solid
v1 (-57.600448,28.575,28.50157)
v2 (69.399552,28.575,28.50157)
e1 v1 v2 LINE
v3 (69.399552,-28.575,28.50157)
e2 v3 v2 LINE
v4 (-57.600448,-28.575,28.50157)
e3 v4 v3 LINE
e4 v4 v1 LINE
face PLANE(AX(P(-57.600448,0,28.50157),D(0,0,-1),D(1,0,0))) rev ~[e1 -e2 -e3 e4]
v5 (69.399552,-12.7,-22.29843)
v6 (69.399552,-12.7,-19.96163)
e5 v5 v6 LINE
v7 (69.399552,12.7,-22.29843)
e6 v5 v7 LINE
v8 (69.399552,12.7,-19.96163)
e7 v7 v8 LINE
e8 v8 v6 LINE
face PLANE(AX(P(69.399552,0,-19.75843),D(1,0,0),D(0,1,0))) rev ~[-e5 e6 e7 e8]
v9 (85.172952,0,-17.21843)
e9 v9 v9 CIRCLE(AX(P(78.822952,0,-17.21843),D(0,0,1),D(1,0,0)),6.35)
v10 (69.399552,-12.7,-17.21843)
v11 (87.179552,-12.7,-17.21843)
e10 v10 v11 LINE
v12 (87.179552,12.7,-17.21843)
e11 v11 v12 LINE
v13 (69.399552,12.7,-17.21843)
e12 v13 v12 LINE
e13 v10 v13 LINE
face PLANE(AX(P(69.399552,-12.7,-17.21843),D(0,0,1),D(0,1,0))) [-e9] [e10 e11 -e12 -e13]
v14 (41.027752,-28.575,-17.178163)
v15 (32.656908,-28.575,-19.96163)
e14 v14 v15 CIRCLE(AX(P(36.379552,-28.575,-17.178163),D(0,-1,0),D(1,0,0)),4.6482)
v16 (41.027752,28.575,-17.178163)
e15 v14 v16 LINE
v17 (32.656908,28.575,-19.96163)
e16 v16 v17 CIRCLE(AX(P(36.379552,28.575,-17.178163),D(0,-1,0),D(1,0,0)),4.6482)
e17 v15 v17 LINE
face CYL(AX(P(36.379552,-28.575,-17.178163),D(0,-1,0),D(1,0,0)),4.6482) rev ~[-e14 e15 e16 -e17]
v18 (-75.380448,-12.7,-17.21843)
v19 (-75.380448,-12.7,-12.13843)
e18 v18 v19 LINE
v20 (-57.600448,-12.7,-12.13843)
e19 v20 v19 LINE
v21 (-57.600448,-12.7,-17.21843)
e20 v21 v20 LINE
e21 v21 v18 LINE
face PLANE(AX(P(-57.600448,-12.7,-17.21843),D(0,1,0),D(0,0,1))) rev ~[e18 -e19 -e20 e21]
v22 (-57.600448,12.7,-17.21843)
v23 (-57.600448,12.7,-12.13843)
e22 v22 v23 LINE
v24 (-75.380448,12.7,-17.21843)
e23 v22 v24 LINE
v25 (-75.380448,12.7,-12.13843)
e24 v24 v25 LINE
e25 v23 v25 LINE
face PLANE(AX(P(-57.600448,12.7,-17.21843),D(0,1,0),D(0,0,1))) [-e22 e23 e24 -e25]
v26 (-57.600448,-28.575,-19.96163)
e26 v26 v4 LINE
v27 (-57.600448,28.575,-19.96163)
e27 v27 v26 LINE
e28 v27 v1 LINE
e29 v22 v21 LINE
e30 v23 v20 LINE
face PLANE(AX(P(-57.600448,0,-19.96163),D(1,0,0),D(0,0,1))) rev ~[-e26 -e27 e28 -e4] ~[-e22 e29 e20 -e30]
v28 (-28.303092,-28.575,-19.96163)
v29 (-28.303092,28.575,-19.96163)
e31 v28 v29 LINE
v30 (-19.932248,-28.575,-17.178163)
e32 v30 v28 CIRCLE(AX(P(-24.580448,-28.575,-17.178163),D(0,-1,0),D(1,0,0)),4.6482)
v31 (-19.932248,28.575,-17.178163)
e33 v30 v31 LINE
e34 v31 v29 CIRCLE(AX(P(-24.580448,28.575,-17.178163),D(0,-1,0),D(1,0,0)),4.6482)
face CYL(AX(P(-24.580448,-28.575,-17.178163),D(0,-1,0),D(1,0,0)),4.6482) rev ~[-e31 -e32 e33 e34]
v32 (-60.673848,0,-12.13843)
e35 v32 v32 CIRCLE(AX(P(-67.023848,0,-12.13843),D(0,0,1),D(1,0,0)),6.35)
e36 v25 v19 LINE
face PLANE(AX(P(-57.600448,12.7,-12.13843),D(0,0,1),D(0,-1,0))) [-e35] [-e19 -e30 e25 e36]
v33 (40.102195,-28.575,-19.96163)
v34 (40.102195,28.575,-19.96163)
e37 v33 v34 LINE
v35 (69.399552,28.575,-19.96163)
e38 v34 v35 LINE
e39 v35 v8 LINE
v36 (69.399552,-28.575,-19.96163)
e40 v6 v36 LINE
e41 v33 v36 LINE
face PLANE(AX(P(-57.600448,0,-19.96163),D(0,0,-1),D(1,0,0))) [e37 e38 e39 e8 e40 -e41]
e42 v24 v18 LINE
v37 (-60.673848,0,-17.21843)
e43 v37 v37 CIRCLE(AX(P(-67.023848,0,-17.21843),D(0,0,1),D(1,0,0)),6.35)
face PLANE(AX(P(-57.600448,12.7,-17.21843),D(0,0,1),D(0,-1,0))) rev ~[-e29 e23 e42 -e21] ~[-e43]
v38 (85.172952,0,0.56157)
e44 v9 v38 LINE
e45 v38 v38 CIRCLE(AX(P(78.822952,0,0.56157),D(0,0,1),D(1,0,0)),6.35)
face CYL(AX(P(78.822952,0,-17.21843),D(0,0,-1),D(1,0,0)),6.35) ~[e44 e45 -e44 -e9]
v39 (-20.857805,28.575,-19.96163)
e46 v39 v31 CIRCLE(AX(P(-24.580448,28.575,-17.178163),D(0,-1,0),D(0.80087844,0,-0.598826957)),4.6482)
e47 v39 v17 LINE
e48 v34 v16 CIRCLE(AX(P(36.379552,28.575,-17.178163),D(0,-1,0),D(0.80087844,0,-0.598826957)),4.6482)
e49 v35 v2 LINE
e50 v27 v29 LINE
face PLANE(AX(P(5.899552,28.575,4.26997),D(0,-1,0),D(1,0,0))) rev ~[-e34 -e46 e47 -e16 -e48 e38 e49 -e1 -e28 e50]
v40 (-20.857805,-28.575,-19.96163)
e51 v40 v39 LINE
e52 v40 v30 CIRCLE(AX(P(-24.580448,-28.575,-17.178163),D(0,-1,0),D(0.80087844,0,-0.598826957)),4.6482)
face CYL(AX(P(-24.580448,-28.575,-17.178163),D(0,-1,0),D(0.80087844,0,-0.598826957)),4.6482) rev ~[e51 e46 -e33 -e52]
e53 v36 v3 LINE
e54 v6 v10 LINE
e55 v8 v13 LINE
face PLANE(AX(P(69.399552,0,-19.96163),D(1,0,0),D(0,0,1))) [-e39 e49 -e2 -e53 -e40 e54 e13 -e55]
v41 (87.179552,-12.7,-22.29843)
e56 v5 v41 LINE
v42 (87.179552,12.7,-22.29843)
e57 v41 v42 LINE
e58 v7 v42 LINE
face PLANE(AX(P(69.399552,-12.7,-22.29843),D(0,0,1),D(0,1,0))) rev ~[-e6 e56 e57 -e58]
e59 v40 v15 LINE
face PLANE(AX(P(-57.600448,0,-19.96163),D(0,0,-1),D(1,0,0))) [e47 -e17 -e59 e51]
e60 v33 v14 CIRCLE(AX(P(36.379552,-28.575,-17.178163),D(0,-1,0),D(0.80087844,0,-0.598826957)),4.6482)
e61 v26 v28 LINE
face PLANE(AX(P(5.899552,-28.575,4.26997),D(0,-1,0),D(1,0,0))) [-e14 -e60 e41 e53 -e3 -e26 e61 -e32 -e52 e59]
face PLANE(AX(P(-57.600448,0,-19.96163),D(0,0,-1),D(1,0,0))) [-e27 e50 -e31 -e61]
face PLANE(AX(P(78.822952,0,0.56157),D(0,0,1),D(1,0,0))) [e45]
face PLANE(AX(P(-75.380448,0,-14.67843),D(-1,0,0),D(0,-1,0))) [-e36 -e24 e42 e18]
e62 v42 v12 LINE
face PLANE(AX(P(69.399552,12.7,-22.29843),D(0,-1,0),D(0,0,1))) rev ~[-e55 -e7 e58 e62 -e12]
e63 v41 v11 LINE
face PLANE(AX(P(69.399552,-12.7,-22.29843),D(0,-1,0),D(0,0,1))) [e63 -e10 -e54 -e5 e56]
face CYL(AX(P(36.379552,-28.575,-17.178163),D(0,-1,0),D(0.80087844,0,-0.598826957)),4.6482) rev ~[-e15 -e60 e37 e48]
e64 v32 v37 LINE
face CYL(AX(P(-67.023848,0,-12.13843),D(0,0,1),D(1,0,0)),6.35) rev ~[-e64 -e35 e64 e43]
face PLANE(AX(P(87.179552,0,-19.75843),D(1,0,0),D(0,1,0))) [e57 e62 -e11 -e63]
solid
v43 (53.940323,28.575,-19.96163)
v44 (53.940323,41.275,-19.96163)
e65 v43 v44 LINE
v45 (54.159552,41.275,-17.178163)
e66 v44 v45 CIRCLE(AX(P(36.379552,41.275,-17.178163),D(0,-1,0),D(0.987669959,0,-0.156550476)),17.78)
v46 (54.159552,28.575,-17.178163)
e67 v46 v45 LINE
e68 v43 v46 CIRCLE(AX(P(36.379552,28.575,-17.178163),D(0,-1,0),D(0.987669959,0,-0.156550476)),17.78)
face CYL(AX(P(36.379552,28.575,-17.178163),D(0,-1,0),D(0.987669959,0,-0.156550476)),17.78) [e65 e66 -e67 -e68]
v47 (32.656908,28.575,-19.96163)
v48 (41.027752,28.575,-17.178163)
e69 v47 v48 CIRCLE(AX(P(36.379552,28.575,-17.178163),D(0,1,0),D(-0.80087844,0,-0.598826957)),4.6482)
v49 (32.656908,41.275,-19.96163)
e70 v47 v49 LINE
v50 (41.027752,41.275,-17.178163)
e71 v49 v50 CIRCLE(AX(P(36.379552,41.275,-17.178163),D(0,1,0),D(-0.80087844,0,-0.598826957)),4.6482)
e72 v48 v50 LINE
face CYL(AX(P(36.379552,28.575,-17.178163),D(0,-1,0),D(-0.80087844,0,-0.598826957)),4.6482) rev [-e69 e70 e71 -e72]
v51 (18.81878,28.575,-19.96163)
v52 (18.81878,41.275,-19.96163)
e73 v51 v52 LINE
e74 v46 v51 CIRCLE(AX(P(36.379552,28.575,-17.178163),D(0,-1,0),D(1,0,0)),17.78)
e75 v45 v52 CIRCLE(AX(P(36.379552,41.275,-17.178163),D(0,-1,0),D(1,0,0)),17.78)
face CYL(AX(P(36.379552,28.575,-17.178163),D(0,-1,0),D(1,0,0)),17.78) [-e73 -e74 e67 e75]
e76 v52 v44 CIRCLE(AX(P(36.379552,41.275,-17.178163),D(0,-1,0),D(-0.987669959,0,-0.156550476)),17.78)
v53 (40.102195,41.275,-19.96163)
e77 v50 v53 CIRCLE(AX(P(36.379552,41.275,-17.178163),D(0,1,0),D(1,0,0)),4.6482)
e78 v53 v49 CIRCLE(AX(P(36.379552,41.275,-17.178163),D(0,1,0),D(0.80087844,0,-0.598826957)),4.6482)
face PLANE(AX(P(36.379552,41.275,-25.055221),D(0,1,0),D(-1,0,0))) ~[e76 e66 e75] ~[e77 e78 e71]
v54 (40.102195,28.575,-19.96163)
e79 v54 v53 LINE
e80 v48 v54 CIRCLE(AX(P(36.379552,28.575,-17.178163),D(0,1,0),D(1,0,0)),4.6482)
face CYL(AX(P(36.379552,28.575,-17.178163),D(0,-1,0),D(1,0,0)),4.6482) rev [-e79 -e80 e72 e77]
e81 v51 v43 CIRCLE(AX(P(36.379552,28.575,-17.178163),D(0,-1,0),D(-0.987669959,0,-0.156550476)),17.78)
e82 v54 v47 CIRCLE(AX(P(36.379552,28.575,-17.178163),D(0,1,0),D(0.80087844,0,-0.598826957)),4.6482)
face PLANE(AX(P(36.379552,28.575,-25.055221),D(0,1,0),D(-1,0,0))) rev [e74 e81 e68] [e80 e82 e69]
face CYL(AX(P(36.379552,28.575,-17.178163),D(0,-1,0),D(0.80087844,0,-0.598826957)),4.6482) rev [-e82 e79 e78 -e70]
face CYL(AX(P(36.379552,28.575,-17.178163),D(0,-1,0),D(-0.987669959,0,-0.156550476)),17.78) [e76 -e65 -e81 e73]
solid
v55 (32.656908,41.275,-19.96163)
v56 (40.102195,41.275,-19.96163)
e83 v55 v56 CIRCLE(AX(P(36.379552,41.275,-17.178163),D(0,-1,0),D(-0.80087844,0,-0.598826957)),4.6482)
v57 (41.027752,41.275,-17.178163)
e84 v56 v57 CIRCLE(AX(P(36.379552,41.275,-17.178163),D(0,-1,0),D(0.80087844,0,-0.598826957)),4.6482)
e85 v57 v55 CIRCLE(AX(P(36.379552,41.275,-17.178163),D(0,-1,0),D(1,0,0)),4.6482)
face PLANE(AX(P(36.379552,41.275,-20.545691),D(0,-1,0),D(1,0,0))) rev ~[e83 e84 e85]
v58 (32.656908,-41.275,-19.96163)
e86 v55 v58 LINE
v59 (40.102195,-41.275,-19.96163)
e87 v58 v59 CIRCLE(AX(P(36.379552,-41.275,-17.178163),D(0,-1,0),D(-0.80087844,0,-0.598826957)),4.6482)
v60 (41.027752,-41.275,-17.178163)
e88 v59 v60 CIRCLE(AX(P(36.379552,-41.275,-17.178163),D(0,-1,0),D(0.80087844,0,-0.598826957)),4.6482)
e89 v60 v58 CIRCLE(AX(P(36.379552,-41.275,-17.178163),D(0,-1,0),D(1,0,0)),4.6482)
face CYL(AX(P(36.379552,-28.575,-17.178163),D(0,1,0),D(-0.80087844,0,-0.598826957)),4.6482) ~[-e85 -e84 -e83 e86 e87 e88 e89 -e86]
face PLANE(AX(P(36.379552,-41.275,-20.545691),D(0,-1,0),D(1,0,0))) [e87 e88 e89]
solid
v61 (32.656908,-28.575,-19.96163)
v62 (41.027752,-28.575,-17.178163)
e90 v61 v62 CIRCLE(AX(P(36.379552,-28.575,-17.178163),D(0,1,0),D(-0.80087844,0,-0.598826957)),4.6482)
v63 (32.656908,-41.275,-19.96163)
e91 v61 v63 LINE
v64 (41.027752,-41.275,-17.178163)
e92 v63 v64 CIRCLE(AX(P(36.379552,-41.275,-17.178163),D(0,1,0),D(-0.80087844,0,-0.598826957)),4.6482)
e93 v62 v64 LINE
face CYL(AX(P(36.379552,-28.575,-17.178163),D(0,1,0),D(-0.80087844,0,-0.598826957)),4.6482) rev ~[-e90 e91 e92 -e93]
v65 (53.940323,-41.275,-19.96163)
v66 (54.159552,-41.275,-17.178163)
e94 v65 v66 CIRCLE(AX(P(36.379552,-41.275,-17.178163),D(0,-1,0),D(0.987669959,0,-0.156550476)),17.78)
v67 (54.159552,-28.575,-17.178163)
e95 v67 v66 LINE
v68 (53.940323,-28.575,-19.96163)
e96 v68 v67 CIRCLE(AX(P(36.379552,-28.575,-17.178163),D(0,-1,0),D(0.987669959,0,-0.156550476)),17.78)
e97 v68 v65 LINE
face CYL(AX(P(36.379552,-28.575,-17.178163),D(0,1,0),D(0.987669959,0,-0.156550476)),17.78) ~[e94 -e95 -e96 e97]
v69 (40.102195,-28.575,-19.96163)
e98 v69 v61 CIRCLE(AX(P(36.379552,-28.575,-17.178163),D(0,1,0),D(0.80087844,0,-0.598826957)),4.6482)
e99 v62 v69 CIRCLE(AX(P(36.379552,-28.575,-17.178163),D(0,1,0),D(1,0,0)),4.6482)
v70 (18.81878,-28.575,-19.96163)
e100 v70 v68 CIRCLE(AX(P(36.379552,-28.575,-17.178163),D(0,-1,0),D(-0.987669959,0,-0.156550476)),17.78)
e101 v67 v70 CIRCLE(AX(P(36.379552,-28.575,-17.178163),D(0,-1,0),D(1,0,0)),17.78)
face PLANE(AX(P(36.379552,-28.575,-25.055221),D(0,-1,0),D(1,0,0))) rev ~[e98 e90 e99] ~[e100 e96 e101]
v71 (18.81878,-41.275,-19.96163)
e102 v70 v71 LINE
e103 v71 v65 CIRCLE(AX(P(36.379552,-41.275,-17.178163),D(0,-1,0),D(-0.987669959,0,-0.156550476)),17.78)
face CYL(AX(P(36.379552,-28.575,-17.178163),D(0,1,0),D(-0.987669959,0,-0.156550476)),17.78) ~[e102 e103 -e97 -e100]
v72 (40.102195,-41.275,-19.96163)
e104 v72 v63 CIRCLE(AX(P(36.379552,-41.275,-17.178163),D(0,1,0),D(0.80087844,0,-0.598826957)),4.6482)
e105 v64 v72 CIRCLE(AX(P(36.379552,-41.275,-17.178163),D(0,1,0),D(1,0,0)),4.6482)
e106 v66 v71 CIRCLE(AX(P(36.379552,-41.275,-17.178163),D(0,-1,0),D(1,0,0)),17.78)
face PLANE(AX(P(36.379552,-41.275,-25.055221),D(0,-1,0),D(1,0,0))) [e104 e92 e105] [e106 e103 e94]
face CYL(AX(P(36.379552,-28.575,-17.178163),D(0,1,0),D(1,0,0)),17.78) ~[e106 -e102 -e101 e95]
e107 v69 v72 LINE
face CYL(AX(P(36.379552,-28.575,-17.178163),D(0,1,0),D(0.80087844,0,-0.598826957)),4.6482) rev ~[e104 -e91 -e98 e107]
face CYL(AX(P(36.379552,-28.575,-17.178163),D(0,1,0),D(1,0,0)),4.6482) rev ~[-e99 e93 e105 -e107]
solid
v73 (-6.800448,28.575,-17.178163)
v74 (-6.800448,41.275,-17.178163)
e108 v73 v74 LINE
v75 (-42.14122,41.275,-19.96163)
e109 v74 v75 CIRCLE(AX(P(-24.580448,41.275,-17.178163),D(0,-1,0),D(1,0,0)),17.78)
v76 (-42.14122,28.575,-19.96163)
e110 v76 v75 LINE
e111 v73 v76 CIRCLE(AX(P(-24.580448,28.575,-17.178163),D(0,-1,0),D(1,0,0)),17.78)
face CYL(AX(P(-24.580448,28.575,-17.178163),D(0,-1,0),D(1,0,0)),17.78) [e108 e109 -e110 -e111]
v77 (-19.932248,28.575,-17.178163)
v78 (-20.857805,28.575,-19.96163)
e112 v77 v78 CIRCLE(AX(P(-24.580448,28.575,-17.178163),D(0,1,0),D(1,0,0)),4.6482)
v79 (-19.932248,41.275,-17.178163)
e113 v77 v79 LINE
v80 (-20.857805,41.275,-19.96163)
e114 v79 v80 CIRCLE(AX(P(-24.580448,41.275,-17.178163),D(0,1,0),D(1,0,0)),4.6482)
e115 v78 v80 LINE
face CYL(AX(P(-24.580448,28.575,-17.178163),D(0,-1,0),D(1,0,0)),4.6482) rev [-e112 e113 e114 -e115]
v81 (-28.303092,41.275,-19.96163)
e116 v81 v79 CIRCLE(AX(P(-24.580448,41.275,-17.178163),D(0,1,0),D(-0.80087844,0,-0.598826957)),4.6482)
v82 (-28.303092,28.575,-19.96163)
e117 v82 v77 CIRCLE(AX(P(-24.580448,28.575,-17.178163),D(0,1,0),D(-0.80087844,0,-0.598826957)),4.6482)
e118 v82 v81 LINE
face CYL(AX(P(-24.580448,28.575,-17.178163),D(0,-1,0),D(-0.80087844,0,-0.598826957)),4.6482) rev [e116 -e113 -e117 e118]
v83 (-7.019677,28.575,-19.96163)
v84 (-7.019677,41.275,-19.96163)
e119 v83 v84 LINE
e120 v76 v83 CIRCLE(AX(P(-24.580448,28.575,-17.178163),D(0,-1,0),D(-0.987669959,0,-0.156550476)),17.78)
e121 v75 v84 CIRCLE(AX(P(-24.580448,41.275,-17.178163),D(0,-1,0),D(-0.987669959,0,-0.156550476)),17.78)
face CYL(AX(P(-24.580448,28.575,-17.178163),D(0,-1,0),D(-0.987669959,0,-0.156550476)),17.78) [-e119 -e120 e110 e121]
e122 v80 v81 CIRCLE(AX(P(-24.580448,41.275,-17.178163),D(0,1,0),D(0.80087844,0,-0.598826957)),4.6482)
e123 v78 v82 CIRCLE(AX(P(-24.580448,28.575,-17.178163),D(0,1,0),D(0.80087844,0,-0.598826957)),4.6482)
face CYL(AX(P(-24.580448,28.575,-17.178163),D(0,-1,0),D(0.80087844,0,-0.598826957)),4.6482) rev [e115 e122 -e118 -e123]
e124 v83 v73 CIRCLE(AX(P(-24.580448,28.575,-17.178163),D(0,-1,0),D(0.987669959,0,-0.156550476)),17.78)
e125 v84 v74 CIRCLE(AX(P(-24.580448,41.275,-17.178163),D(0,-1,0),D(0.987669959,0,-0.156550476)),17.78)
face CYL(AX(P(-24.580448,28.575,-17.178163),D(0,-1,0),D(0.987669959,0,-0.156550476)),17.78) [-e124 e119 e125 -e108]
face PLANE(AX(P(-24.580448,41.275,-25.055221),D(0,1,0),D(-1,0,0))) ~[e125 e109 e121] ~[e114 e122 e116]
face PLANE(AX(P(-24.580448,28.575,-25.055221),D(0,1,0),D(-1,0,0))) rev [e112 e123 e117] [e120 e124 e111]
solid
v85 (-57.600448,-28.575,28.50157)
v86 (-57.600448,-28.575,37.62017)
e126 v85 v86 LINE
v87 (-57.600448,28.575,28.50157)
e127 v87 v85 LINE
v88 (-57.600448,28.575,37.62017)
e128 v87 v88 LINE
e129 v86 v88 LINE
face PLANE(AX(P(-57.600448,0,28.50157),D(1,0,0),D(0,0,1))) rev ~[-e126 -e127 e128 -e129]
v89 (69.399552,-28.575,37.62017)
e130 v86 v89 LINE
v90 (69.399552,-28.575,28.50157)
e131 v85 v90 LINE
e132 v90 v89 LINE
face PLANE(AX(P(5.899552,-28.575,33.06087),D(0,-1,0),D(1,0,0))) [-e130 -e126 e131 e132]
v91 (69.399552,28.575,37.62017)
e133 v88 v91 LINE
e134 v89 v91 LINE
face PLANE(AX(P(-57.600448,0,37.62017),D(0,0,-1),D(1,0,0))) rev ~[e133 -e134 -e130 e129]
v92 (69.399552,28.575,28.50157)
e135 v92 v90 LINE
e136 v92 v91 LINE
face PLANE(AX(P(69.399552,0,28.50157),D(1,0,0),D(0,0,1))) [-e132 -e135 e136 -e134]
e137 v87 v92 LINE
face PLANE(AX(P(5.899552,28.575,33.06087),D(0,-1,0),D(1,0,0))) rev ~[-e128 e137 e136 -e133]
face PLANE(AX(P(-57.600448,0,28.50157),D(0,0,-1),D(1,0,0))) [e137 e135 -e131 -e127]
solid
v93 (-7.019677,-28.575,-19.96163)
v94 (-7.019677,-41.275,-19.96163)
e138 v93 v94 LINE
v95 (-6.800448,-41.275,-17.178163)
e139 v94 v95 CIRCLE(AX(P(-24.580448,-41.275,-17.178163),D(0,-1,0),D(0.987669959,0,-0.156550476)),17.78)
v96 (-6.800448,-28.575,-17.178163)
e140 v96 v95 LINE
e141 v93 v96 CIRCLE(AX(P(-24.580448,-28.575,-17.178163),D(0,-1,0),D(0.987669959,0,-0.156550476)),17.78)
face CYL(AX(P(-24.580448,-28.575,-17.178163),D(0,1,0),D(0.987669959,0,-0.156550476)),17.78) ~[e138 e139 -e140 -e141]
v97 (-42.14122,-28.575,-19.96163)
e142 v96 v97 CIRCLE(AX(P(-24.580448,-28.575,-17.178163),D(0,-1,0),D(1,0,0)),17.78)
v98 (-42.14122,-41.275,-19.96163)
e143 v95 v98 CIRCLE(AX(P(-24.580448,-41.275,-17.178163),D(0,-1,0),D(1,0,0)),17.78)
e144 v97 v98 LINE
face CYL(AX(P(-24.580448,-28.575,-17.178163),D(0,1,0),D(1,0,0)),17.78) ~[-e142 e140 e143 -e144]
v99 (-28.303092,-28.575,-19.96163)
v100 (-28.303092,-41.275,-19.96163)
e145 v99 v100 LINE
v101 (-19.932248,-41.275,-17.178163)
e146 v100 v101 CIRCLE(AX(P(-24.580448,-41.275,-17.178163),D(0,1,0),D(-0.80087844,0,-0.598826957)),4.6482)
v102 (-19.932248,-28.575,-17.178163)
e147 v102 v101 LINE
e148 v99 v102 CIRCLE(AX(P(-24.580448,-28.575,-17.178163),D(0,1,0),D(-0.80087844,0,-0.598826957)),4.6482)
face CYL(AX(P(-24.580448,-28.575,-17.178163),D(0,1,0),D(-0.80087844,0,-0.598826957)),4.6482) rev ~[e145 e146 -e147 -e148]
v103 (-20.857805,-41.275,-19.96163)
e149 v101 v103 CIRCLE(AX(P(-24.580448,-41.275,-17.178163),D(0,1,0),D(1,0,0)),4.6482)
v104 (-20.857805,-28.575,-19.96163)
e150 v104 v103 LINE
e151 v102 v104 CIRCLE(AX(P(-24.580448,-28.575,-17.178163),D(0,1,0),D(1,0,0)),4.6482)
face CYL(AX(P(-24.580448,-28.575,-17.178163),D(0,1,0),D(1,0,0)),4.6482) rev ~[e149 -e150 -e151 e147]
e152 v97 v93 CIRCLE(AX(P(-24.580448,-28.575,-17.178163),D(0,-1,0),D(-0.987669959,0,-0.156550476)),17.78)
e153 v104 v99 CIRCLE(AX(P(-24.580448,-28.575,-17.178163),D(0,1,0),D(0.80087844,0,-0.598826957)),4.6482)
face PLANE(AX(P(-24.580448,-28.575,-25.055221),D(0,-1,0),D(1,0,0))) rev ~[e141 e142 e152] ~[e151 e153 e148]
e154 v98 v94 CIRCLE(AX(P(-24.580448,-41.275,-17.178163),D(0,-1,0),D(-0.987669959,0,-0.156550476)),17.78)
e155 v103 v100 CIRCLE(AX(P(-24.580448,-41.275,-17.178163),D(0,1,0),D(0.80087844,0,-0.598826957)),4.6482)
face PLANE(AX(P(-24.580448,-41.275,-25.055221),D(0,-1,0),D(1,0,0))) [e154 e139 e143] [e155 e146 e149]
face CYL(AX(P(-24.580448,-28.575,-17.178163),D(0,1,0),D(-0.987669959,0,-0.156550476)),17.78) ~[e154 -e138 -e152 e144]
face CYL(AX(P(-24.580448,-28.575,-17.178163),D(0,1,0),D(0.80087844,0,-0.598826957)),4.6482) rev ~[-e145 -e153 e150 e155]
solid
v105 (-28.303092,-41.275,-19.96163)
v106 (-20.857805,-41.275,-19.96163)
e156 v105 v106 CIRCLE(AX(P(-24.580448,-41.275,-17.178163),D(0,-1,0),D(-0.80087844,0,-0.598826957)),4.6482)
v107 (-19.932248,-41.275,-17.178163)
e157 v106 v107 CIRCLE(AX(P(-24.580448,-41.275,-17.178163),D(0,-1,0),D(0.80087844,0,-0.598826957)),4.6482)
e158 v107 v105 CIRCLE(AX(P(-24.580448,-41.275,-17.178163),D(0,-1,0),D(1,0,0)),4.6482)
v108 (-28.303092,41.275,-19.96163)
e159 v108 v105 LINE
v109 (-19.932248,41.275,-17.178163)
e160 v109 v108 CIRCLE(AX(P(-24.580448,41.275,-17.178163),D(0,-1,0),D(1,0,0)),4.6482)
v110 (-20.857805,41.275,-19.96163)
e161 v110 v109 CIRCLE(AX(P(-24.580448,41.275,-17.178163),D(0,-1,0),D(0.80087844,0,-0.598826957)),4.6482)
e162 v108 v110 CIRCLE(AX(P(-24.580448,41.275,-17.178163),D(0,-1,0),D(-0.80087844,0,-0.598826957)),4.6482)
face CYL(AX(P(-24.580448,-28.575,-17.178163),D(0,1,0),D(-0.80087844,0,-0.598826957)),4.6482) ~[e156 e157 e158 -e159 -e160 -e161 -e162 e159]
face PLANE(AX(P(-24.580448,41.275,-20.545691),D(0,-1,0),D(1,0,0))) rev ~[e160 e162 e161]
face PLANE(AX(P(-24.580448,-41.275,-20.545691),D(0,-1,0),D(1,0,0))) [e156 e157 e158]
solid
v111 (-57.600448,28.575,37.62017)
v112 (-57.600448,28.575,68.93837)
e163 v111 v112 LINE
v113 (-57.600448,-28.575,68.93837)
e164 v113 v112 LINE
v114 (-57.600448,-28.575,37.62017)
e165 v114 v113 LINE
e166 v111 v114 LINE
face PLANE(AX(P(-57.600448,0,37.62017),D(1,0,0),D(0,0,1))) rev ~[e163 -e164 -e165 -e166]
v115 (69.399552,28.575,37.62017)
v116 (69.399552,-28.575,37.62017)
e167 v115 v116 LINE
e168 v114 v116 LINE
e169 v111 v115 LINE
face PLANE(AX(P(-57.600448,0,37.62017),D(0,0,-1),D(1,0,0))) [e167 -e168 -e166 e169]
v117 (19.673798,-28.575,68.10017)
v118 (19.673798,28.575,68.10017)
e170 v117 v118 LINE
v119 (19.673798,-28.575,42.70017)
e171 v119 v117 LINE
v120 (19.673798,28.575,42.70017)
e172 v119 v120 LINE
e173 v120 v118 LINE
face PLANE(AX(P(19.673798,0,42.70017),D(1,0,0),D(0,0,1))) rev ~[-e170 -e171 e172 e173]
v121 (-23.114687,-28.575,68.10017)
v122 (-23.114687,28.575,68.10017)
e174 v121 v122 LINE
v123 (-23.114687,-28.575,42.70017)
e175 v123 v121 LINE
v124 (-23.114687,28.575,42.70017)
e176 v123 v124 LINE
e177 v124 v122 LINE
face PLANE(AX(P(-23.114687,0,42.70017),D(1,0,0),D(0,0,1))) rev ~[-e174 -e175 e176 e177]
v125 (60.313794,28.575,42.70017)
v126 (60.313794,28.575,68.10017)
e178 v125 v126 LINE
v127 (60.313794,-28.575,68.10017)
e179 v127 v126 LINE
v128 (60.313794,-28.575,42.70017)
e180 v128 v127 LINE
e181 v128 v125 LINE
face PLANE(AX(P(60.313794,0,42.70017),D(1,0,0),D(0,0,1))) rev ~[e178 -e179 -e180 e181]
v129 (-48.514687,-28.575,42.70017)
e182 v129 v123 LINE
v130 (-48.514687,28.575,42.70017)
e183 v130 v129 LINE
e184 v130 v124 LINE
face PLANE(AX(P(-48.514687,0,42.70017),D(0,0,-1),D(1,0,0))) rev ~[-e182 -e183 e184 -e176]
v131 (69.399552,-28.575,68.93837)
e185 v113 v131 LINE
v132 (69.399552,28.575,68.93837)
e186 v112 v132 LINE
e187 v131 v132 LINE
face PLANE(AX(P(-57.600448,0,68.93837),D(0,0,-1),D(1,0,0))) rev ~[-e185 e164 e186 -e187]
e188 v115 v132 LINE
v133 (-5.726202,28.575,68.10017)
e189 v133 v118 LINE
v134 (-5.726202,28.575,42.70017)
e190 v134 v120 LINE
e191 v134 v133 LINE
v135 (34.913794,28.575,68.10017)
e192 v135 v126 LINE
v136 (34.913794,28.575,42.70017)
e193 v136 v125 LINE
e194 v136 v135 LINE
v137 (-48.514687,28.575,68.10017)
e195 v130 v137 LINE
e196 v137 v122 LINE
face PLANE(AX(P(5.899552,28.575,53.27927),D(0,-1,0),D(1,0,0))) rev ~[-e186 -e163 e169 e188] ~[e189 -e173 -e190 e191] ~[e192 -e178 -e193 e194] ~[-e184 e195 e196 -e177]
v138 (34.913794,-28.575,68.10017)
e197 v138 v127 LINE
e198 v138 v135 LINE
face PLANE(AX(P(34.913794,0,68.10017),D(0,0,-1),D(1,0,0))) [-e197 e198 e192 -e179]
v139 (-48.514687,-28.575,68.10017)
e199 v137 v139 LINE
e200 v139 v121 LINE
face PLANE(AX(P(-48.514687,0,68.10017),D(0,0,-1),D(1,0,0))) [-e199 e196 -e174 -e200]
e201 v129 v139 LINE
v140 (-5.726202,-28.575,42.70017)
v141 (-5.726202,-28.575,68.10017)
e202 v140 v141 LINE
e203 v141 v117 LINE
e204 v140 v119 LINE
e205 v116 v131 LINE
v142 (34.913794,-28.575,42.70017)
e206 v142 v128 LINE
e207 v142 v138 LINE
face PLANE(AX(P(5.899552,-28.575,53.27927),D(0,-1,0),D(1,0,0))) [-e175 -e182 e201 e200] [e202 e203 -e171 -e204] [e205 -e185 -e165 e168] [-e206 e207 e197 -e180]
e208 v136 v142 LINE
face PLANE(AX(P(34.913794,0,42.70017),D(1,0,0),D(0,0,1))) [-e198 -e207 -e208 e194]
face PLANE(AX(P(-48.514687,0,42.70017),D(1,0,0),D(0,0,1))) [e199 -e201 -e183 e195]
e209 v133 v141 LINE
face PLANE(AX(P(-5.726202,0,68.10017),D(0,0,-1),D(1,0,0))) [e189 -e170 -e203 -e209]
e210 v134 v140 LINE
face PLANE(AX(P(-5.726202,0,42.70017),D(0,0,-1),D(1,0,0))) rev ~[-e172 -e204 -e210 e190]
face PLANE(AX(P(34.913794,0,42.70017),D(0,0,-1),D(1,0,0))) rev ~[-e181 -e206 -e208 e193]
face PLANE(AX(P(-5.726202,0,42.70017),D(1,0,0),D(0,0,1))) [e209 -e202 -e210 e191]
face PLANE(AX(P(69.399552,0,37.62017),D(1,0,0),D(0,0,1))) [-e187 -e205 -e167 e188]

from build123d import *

# Parameters (mm, degrees)
F0_W          = 127
F0_H          = 31.3182
F0_W_2        = 25.4
F0_H_2        = 25.4
F1_DEPTH      = 28.575
F0_H_3        = 48.4632
F0_H_4        = 9.1186
F2_DEPTH      = 28.575
F4_DEPTH      = 12.7
F6_DEPTH      = 23.114
F7_DEPTH      = 82.804
F7_DEPTH_BACK = 76.2
F8_DEPTH      = 69.85
F8_DEPTH_BACK = 12.7
F9_W          = 25.4
F9_H          = 5.08
F10_DEPTH     = 17.78
F11_R         = 6.35
F12_DEPTH     = 17.78
F13_W         = 25.4
F13_H         = 5.08
F14_DEPTH     = 17.78
F15_R         = 6.35
F16_DEPTH     = 25.4


with BuildPart() as f1:
    # F0 (on Front) → F1 (new body, symmetric)
    with BuildSketch(Plane.XZ):
        with Locations((5.8995515195, 53.2792696041)):
            Rectangle(F0_W, F0_H)
        with Locations((-35.8146865249, 55.4001696041)):
            Rectangle(F0_W_2, F0_H_2, mode=Mode.SUBTRACT)
        with Locations((6.9737978751, 55.4001696041)):
            Rectangle(F0_W_2, F0_H_2, mode=Mode.SUBTRACT)
        with Locations((47.6137937195, 55.4001696041)):
            Rectangle(F0_W_2, F0_H_2, mode=Mode.SUBTRACT)
    extrude(amount=F1_DEPTH, both=True)

    # F3 (on face) → F6 (cut)
    with BuildSketch(Plane.XZ.offset(28.575)):
        with BuildLine():
            Line((-28.3030916435, -19.9616303959), (-42.1412203564, -19.9616303959))
            ThreePointArc((-42.1412203564, -19.9616303959), (-24.5804484805, -34.9581629324), (-7.0196766045, -19.9616303959))
            Line((-7.0196766045, -19.9616303959), (-20.8578053174, -19.9616303959))
            ThreePointArc((-20.8578053174, -19.9616303959), (-24.5804484805, -21.8263629324), (-28.3030916435, -19.9616303959))
        make_face()
        with BuildLine():
            Line((32.6569083565, -19.9616303959), (18.8187796436, -19.9616303959))
            ThreePointArc((18.8187796436, -19.9616303959), (36.3795515195, -34.9581629324), (53.9403233955, -19.9616303959))
            Line((53.9403233955, -19.9616303959), (40.1021946826, -19.9616303959))
            ThreePointArc((40.1021946826, -19.9616303959), (36.3795515195, -21.8263629324), (32.6569083565, -19.9616303959))
        make_face()
    extrude(amount=-F6_DEPTH, mode=Mode.SUBTRACT)


with BuildPart() as f1b:
    # F0 (on Front) → F1, piece 2 (new body, symmetric)
    with BuildSketch(Plane.XZ):
        with Locations((5.8995515195, 4.2699696041)):
            Rectangle(F0_W, F0_H_3)
    extrude(amount=F1_DEPTH, both=True)

    # F3 (on face) → F7 (cut, two sides)
    with BuildSketch(Plane.XZ.offset(28.575)) as f7_sk:
        with BuildLine():
            Line((40.1021946826, -19.9616303959), (32.6569083565, -19.9616303959))
            ThreePointArc((32.6569083565, -19.9616303959), (36.3795515195, -21.8263629324), (40.1021946826, -19.9616303959))
        make_face()
        with BuildLine():
            ThreePointArc((41.0277515195, -17.1781629324), (34.9128931937, -12.7674173497), (32.6569083565, -19.9616303959))
            Line((32.6569083565, -19.9616303959), (40.1021946826, -19.9616303959))
            ThreePointArc((40.1021946826, -19.9616303959), (40.7902971022, -18.6448212582), (41.0277515195, -17.1781629324))
        make_face()
        with BuildLine():
            Line((-20.8578053174, -19.9616303959), (-28.3030916435, -19.9616303959))
            ThreePointArc((-28.3030916435, -19.9616303959), (-24.5804484805, -21.8263629324), (-20.8578053174, -19.9616303959))
        make_face()
        with BuildLine():
            ThreePointArc((-19.9322484805, -17.1781629324), (-26.0471068063, -12.7674173497), (-28.3030916435, -19.9616303959))
            Line((-28.3030916435, -19.9616303959), (-20.8578053174, -19.9616303959))
            ThreePointArc((-20.8578053174, -19.9616303959), (-20.1697028978, -18.6448212582), (-19.9322484805, -17.1781629324))
        make_face()
    extrude(amount=-F7_DEPTH, mode=Mode.SUBTRACT)
    extrude(f7_sk.sketch, amount=F7_DEPTH_BACK, mode=Mode.SUBTRACT)

    # F9 (on face) → F10 (join)
    with BuildSketch(Plane.YZ.offset(69.3995515195)):
        with Locations((0, -19.7584303959)):
            Rectangle(F9_W, F9_H)
    extrude(amount=F10_DEPTH)

    # F11 (on face) → F12 (join)
    with BuildSketch(Plane.XY.offset(-17.2184303959)):
        with Locations((78.8229515195, 0)):
            Circle(F11_R)
    extrude(amount=F12_DEPTH)

    # F13 (on face) → F14 (join)
    with BuildSketch(Plane(origin=(-57.6004484805, 0, 0), x_dir=(0, -1, 0), z_dir=(-1, 0, 0))):
        with Locations((0, -14.6784303959)):
            Rectangle(F13_W, F13_H)
    extrude(amount=F14_DEPTH)

    # F15 (on face) → F16 (cut)
    with BuildSketch(Plane.XY.offset(-12.1384303959)):
        with Locations((-67.0238484805, 0)):
            Circle(F15_R)
    extrude(amount=-F16_DEPTH, mode=Mode.SUBTRACT)


with BuildPart() as f2:
    # F0 (on Front) → F2 (new body, symmetric)
    with BuildSketch(Plane.XZ):
        with Locations((5.8995515195, 33.0608696041)):
            Rectangle(F0_W, F0_H_4)
    extrude(amount=F2_DEPTH, both=True)


with BuildPart() as f4:
    # F3 (on face) → F4 (new body)
    with BuildSketch(Plane.XZ.offset(28.575)):
        with BuildLine():
            Line((-28.3030916435, -19.9616303959), (-42.1412203564, -19.9616303959))
            ThreePointArc((-42.1412203564, -19.9616303959), (-24.5804484805, -34.9581629324), (-7.0196766045, -19.9616303959))
            Line((-7.0196766045, -19.9616303959), (-20.8578053174, -19.9616303959))
            ThreePointArc((-20.8578053174, -19.9616303959), (-24.5804484805, -21.8263629324), (-28.3030916435, -19.9616303959))
        make_face()
        with BuildLine():
            ThreePointArc((-7.0196766045, -19.9616303959), (-6.8553402445, -18.5742066361), (-6.8004484805, -17.1781629324))
            ThreePointArc((-6.8004484805, -17.1781629324), (-25.9764921842, 0.5469453036), (-42.1412203564, -19.9616303959))
            Line((-42.1412203564, -19.9616303959), (-28.3030916435, -19.9616303959))
            ThreePointArc((-28.3030916435, -19.9616303959), (-26.0471068063, -12.7674173497), (-19.9322484805, -17.1781629324))
            ThreePointArc((-19.9322484805, -17.1781629324), (-20.1697028978, -18.6448212582), (-20.8578053174, -19.9616303959))
            Line((-20.8578053174, -19.9616303959), (-7.0196766045, -19.9616303959))
        make_face()
    extrude(amount=F4_DEPTH)


with BuildPart() as f4b:
    # F3 (on face) → F4, piece 2 (new body)
    with BuildSketch(Plane.XZ.offset(28.575)):
        with BuildLine():
            Line((32.6569083565, -19.9616303959), (18.8187796436, -19.9616303959))
            ThreePointArc((18.8187796436, -19.9616303959), (36.3795515195, -34.9581629324), (53.9403233955, -19.9616303959))
            Line((53.9403233955, -19.9616303959), (40.1021946826, -19.9616303959))
            ThreePointArc((40.1021946826, -19.9616303959), (36.3795515195, -21.8263629324), (32.6569083565, -19.9616303959))
        make_face()
        with BuildLine():
            ThreePointArc((54.1595515195, -17.1781629324), (34.9835078158, 0.5469453036), (18.8187796436, -19.9616303959))
            Line((18.8187796436, -19.9616303959), (32.6569083565, -19.9616303959))
            ThreePointArc((32.6569083565, -19.9616303959), (34.9128931937, -12.7674173497), (41.0277515195, -17.1781629324))
            ThreePointArc((41.0277515195, -17.1781629324), (40.7902971022, -18.6448212582), (40.1021946826, -19.9616303959))
            Line((40.1021946826, -19.9616303959), (53.9403233955, -19.9616303959))
            ThreePointArc((53.9403233955, -19.9616303959), (54.1046597555, -18.5742066361), (54.1595515195, -17.1781629324))
        make_face()
    extrude(amount=F4_DEPTH)


with BuildPart() as f5_1:
    # F5: instance of F4
    add(f4.part.mirror(Plane.XZ))


with BuildPart() as f5_2:
    # F5: instance of F4b
    add(f4b.part.mirror(Plane.XZ))


with BuildPart() as f8:
    # F3 (on face) → F8 (new body, two sides)
    with BuildSketch(Plane.XZ.offset(28.575)) as f8_sk:
        with BuildLine():
            Line((-20.8578053174, -19.9616303959), (-28.3030916435, -19.9616303959))
            ThreePointArc((-28.3030916435, -19.9616303959), (-24.5804484805, -21.8263629324), (-20.8578053174, -19.9616303959))
        make_face()
        with BuildLine():
            ThreePointArc((-19.9322484805, -17.1781629324), (-26.0471068063, -12.7674173497), (-28.3030916435, -19.9616303959))
            Line((-28.3030916435, -19.9616303959), (-20.8578053174, -19.9616303959))
            ThreePointArc((-20.8578053174, -19.9616303959), (-20.1697028978, -18.6448212582), (-19.9322484805, -17.1781629324))
        make_face()
    extrude(amount=-F8_DEPTH)
    extrude(f8_sk.sketch, amount=F8_DEPTH_BACK)


with BuildPart() as f8b:
    # F3 (on face) → F8, piece 2 (new body, two sides)
    with BuildSketch(Plane.XZ.offset(28.575)) as f8_2_sk:
        with BuildLine():
            Line((40.1021946826, -19.9616303959), (32.6569083565, -19.9616303959))
            ThreePointArc((32.6569083565, -19.9616303959), (36.3795515195, -21.8263629324), (40.1021946826, -19.9616303959))
        make_face()
        with BuildLine():
            ThreePointArc((41.0277515195, -17.1781629324), (34.9128931937, -12.7674173497), (32.6569083565, -19.9616303959))
            Line((32.6569083565, -19.9616303959), (40.1021946826, -19.9616303959))
            ThreePointArc((40.1021946826, -19.9616303959), (40.7902971022, -18.6448212582), (41.0277515195, -17.1781629324))
        make_face()
    extrude(amount=-F8_DEPTH)
    extrude(f8_2_sk.sketch, amount=F8_DEPTH_BACK)


solid = Compound([f1.part, f1b.part, f2.part, f4.part, f4b.part, f5_1.part, f5_2.part, f8.part, f8b.part])
